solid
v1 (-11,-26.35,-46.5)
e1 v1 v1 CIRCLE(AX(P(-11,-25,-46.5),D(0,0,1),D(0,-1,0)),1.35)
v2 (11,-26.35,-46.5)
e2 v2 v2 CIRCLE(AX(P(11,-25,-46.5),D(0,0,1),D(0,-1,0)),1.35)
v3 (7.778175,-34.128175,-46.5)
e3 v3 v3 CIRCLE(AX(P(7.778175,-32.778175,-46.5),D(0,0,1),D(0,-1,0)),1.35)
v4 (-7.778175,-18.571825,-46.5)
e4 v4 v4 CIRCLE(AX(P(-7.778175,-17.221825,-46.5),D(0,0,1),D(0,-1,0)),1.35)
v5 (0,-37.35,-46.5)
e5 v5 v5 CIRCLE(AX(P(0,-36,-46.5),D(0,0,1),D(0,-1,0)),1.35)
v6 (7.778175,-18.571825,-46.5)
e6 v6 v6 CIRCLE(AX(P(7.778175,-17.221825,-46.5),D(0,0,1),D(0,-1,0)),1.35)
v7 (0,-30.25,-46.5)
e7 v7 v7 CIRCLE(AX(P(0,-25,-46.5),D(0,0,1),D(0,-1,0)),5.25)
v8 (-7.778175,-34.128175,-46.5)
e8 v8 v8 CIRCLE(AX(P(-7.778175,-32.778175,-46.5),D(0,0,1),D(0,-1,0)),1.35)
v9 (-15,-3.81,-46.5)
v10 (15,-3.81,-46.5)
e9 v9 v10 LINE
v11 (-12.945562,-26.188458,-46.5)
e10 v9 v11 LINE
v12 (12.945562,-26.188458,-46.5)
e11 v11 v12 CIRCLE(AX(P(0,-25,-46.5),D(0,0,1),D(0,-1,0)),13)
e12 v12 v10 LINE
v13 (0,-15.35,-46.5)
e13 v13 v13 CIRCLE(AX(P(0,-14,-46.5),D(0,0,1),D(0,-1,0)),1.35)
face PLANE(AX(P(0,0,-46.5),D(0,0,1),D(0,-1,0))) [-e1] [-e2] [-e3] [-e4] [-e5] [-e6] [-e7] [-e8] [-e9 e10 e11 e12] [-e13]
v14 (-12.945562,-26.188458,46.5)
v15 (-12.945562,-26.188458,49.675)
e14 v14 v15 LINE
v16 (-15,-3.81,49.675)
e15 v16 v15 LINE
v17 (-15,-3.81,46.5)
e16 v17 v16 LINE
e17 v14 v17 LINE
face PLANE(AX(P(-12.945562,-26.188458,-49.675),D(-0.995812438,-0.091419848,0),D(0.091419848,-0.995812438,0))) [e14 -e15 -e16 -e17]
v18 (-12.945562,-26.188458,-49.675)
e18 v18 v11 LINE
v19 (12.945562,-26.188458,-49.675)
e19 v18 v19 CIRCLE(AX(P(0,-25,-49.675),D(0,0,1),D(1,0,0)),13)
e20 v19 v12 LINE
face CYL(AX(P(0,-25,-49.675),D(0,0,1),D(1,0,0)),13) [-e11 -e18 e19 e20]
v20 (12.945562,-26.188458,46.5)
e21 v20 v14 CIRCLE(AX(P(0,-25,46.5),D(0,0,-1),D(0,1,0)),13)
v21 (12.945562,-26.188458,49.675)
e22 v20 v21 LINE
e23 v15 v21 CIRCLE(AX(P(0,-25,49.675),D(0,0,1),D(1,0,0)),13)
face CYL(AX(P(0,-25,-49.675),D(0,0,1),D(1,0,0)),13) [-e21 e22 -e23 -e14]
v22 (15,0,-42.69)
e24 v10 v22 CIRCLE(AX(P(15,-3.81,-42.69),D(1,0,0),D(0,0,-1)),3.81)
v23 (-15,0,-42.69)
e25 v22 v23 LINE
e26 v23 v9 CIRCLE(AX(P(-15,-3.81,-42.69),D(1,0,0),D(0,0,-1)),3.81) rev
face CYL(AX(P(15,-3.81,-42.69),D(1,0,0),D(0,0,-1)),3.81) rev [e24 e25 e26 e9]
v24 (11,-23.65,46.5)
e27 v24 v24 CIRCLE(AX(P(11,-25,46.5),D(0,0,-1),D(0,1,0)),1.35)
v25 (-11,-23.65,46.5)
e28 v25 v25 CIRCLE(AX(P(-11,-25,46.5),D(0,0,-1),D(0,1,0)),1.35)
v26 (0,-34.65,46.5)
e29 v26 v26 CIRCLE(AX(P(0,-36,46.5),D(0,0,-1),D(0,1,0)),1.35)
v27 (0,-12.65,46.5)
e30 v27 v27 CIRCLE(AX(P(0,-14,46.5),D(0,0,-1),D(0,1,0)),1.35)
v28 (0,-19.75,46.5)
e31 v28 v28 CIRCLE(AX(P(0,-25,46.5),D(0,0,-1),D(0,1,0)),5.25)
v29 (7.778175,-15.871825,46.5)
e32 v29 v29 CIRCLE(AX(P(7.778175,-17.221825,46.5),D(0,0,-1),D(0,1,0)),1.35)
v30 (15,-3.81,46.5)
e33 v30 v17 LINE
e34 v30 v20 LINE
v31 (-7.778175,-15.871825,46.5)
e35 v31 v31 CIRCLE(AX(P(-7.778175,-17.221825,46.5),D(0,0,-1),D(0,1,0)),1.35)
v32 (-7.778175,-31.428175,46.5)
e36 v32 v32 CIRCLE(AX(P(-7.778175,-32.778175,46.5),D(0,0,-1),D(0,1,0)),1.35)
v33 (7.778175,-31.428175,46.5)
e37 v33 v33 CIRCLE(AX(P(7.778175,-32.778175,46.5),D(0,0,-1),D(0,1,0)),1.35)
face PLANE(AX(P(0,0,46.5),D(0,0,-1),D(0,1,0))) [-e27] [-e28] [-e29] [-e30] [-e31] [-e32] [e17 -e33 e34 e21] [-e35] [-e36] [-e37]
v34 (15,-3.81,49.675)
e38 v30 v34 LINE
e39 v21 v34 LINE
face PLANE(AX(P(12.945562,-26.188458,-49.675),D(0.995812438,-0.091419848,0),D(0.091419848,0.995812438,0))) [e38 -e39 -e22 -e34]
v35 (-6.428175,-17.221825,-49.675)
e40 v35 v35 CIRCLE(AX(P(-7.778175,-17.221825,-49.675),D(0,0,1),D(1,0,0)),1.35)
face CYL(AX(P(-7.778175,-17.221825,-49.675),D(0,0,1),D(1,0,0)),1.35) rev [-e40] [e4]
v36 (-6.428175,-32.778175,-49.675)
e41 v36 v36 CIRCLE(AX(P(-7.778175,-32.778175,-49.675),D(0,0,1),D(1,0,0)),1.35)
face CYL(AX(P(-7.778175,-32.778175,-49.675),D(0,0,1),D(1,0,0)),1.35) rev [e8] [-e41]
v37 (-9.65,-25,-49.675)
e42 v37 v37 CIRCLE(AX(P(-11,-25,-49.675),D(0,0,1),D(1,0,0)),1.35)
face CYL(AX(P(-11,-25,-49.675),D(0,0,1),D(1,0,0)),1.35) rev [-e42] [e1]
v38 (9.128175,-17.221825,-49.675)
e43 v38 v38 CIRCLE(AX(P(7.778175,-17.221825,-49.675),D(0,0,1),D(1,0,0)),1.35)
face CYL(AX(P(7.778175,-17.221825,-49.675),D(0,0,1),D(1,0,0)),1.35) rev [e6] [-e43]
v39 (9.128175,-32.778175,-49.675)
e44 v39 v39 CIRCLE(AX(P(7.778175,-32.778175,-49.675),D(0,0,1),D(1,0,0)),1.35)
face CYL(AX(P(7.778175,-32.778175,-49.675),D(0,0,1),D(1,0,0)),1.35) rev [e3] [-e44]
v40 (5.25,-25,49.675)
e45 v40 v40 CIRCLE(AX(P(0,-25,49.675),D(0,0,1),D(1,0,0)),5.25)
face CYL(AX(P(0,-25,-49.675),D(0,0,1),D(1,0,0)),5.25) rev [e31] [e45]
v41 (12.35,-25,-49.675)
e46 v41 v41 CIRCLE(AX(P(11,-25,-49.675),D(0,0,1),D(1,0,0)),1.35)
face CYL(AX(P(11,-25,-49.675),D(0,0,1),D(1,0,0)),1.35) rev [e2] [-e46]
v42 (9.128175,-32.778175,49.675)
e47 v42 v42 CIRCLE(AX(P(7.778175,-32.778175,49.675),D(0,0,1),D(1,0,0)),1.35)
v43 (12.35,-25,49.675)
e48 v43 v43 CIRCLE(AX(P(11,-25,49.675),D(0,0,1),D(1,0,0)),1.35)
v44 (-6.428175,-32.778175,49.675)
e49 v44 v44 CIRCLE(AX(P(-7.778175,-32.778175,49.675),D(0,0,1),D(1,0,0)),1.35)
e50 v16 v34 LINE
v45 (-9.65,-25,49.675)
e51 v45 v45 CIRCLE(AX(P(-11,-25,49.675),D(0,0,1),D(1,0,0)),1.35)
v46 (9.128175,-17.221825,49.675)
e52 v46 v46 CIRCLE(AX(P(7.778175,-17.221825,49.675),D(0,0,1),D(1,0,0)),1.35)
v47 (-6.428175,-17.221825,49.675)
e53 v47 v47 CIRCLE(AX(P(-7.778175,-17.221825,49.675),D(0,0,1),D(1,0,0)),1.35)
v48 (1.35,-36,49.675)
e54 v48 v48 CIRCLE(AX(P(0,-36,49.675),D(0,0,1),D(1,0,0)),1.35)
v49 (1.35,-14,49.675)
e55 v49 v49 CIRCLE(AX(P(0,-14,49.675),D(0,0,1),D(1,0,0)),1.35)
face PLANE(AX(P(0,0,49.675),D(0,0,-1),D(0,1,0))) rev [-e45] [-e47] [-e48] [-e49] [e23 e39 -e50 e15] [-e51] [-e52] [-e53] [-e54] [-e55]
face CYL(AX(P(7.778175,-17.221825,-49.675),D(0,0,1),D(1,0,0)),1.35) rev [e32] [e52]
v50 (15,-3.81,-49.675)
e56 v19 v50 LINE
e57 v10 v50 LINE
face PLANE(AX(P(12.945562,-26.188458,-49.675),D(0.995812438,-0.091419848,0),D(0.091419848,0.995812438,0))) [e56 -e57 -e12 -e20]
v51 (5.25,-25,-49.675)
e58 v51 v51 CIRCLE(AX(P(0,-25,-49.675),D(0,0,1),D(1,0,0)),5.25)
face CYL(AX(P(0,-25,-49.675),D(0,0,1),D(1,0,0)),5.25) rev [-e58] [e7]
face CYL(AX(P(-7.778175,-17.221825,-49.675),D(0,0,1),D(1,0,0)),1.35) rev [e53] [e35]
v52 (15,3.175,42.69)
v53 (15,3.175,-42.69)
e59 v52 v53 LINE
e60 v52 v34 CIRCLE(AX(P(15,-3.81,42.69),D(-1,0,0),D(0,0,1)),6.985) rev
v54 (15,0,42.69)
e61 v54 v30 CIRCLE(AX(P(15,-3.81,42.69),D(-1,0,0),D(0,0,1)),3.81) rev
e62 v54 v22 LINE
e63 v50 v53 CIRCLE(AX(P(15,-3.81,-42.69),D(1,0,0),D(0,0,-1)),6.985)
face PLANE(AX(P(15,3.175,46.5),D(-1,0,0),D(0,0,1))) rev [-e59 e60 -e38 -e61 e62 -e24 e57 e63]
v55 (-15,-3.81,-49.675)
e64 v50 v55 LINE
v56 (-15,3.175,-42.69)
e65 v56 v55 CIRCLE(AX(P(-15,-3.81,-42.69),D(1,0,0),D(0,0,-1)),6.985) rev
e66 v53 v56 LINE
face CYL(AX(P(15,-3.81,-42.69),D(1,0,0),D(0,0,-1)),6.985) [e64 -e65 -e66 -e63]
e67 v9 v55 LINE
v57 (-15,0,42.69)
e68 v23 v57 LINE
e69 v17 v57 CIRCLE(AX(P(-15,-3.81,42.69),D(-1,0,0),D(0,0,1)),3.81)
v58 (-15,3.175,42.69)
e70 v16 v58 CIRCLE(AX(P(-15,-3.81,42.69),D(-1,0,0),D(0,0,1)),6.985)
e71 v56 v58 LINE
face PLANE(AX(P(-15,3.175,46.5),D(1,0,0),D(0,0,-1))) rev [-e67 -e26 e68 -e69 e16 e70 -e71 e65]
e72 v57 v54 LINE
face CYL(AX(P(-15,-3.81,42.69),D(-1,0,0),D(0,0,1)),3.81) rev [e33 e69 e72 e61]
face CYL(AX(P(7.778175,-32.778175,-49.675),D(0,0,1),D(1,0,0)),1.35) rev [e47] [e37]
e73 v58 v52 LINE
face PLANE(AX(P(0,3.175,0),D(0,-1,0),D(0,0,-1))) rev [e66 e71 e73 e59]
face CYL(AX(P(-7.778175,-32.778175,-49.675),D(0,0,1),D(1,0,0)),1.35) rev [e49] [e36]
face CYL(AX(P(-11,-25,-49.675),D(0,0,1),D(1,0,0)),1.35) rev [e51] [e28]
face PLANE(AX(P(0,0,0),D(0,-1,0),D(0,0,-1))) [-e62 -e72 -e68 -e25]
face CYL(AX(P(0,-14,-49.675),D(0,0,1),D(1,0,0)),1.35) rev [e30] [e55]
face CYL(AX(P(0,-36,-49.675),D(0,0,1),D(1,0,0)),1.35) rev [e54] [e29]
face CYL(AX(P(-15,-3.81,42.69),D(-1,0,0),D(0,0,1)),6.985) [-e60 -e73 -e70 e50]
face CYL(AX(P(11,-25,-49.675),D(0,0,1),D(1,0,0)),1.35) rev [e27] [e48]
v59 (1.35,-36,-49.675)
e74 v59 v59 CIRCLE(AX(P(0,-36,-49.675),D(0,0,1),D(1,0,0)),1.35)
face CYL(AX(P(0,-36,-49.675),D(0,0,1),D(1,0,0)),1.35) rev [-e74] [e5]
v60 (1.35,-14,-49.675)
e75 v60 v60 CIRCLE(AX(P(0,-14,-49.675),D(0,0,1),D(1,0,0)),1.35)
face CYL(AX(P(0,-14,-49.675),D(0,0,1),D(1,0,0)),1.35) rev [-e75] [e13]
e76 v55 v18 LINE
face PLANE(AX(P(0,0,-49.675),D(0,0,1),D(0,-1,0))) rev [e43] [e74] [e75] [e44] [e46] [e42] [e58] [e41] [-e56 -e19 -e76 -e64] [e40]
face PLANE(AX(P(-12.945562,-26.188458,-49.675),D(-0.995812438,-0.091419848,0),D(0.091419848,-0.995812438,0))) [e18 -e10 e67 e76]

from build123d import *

# Parameters (mm, degrees)
SKETCH1_W                      = 30
SKETCH1_H                      = 93
BASE_FLANGE1_DEPTH             = 3.175
EDGE_FLANGE1_STRIP_W           = 20.32
EDGE_FLANGE1_STRIP_H           = 3.175
EDGE_FLANGE1_STRIP_CUT_DEPTH   = 30
EDGE_FLANGE1_STRIP_2_W         = 20.32
EDGE_FLANGE1_STRIP_2_H         = 3.175
EDGE_FLANGE1_STRIP_CUT_2_DEPTH = 30
EDGE_FLANGE1_DEPTH             = 30
EDGE_FLANGE1_BEND_DEPTH        = 30
CUT_EXTRUDE1_DEPTH             = 65.316449101
CUT_EXTRUDE1_DEPTH_BACK        = 65.316449101
SKETCH12_OUTSIDE_W             = 54.33
SKETCH12_OUTSIDE_H             = 65.505
SKETCH12_OUTSIDE_R             = 1.35
SKETCH12_OUTSIDE_R_2           = 5.25


# Sheet-metal steps are written as plain solids
with BuildPart() as part:
    # Sketch1 → Base-Flange1 (new body)
    with BuildSketch(Plane(origin=(0, 0, 0), x_dir=(1, 0, 0), z_dir=(0, 1, 0))):
        Rectangle(SKETCH1_W, SKETCH1_H)
    extrude(amount=BASE_FLANGE1_DEPTH)

    # Edge-Flange1 strip (across the edge) → Edge-Flange1 strip cut (cut)
    with BuildSketch(Plane(origin=(15, 0, 46.5), x_dir=(0, 0, -1), z_dir=(-1, 0, 0))):
        with Locations((-6.35, -1.5875)):
            Rectangle(EDGE_FLANGE1_STRIP_W, EDGE_FLANGE1_STRIP_H)
    extrude(amount=EDGE_FLANGE1_STRIP_CUT_DEPTH, mode=Mode.SUBTRACT)

    # Edge-Flange1 strip 2 (across the edge) → Edge-Flange1 strip cut 2 (cut)
    with BuildSketch(Plane(origin=(-15, 0, -46.5), x_dir=(0, 0, 1), z_dir=(1, 0, 0))):
        with Locations((-6.35, -1.5875)):
            Rectangle(EDGE_FLANGE1_STRIP_2_W, EDGE_FLANGE1_STRIP_2_H)
    extrude(amount=EDGE_FLANGE1_STRIP_CUT_2_DEPTH, mode=Mode.SUBTRACT)

    # Edge-Flange1 section (across the edge) → Edge-Flange1 (add)
    with BuildSketch(Plane(origin=(15, 0, 46.5), x_dir=(0, 0, -1), z_dir=(-1, 0, 0))):
        with BuildLine():
            Line((-3.175, 3.81), (-3.175, 38))
            Line((-3.175, 38), (0, 38))
            Line((0, 38), (0, 3.81))
            ThreePointArc((0, 3.81), (1.115923164, 1.115923164), (3.81, 0))
            Line((3.81, 0), (3.81, -3.175))
            ThreePointArc((3.81, -3.175), (-1.129140867, -1.129140867), (-3.175, 3.81))
        make_face()
    extrude(amount=EDGE_FLANGE1_DEPTH)

    # Edge-Flange1 section 2 (across the edge) → Edge-Flange1 bend (add)
    with BuildSketch(Plane(origin=(-15, 0, -46.5), x_dir=(0, 0, 1), z_dir=(1, 0, 0))):
        with BuildLine():
            Line((-3.175, 3.81), (-3.175, 38))
            Line((-3.175, 38), (0, 38))
            Line((0, 38), (0, 3.81))
            ThreePointArc((0, 3.81), (1.115923164, 1.115923164), (3.81, 0))
            Line((3.81, 0), (3.81, -3.175))
            ThreePointArc((3.81, -3.175), (-1.129140867, -1.129140867), (-3.175, 3.81))
        make_face()
    extrude(amount=EDGE_FLANGE1_BEND_DEPTH)

    # Sketch12 outside → Cut-Extrude1 (cut, two sides: drawn at the far end of the back side and taken through both)
    # profile 1 of 10: a face of its own
    with BuildSketch(Plane.XY.offset(-CUT_EXTRUDE1_DEPTH_BACK)):
        with Locations((0, -17.4125)):
            Rectangle(SKETCH12_OUTSIDE_W, SKETCH12_OUTSIDE_H)
        with BuildLine():
            Line((12.945561693, -26.188458018), (15, -3.81))
            Line((15, -3.81), (15, 3.175))
            Line((15, 3.175), (-15, 3.175))
            Line((-15, 3.175), (-15, -3.81))
            Line((-15, -3.81), (-12.945561693, -26.188458018))
            ThreePointArc((-12.945561693, -26.188458018), (0, -38), (12.945561693, -26.188458018))
        make_face(mode=Mode.SUBTRACT)
    # profile 2 of 10: a face of its own
    with BuildSketch(Plane.XY.offset(-CUT_EXTRUDE1_DEPTH_BACK)):
        with Locations((0, -36)):
            Circle(SKETCH12_OUTSIDE_R)
    # profile 3 of 10: a face of its own
    with BuildSketch(Plane.XY.offset(-CUT_EXTRUDE1_DEPTH_BACK)):
        with Locations((-7.778174593, -32.778174593)):
            Circle(SKETCH12_OUTSIDE_R)
    # profile 4 of 10: a face of its own
    with BuildSketch(Plane.XY.offset(-CUT_EXTRUDE1_DEPTH_BACK)):
        with Locations((-11, -25)):
            Circle(SKETCH12_OUTSIDE_R)
    # profile 5 of 10: a face of its own
    with BuildSketch(Plane.XY.offset(-CUT_EXTRUDE1_DEPTH_BACK)):
        with Locations((-7.778174593, -17.221825407)):
            Circle(SKETCH12_OUTSIDE_R)
    # profile 6 of 10: a face of its own
    with BuildSketch(Plane.XY.offset(-CUT_EXTRUDE1_DEPTH_BACK)):
        with Locations((0, -14)):
            Circle(SKETCH12_OUTSIDE_R)
    # profile 7 of 10: a face of its own
    with BuildSketch(Plane.XY.offset(-CUT_EXTRUDE1_DEPTH_BACK)):
        with Locations((7.778174593, -17.221825407)):
            Circle(SKETCH12_OUTSIDE_R)
    # profile 8 of 10: a face of its own
    with BuildSketch(Plane.XY.offset(-CUT_EXTRUDE1_DEPTH_BACK)):
        with Locations((11, -25)):
            Circle(SKETCH12_OUTSIDE_R)
    # profile 9 of 10: a face of its own
    with BuildSketch(Plane.XY.offset(-CUT_EXTRUDE1_DEPTH_BACK)):
        with Locations((7.778174593, -32.778174593)):
            Circle(SKETCH12_OUTSIDE_R)
    # profile 10 of 10: a face of its own
    with BuildSketch(Plane.XY.offset(-CUT_EXTRUDE1_DEPTH_BACK)):
        with Locations((0, -25)):
            Circle(SKETCH12_OUTSIDE_R_2)
    extrude(amount=CUT_EXTRUDE1_DEPTH + CUT_EXTRUDE1_DEPTH_BACK, mode=Mode.SUBTRACT)


solid = part.part
